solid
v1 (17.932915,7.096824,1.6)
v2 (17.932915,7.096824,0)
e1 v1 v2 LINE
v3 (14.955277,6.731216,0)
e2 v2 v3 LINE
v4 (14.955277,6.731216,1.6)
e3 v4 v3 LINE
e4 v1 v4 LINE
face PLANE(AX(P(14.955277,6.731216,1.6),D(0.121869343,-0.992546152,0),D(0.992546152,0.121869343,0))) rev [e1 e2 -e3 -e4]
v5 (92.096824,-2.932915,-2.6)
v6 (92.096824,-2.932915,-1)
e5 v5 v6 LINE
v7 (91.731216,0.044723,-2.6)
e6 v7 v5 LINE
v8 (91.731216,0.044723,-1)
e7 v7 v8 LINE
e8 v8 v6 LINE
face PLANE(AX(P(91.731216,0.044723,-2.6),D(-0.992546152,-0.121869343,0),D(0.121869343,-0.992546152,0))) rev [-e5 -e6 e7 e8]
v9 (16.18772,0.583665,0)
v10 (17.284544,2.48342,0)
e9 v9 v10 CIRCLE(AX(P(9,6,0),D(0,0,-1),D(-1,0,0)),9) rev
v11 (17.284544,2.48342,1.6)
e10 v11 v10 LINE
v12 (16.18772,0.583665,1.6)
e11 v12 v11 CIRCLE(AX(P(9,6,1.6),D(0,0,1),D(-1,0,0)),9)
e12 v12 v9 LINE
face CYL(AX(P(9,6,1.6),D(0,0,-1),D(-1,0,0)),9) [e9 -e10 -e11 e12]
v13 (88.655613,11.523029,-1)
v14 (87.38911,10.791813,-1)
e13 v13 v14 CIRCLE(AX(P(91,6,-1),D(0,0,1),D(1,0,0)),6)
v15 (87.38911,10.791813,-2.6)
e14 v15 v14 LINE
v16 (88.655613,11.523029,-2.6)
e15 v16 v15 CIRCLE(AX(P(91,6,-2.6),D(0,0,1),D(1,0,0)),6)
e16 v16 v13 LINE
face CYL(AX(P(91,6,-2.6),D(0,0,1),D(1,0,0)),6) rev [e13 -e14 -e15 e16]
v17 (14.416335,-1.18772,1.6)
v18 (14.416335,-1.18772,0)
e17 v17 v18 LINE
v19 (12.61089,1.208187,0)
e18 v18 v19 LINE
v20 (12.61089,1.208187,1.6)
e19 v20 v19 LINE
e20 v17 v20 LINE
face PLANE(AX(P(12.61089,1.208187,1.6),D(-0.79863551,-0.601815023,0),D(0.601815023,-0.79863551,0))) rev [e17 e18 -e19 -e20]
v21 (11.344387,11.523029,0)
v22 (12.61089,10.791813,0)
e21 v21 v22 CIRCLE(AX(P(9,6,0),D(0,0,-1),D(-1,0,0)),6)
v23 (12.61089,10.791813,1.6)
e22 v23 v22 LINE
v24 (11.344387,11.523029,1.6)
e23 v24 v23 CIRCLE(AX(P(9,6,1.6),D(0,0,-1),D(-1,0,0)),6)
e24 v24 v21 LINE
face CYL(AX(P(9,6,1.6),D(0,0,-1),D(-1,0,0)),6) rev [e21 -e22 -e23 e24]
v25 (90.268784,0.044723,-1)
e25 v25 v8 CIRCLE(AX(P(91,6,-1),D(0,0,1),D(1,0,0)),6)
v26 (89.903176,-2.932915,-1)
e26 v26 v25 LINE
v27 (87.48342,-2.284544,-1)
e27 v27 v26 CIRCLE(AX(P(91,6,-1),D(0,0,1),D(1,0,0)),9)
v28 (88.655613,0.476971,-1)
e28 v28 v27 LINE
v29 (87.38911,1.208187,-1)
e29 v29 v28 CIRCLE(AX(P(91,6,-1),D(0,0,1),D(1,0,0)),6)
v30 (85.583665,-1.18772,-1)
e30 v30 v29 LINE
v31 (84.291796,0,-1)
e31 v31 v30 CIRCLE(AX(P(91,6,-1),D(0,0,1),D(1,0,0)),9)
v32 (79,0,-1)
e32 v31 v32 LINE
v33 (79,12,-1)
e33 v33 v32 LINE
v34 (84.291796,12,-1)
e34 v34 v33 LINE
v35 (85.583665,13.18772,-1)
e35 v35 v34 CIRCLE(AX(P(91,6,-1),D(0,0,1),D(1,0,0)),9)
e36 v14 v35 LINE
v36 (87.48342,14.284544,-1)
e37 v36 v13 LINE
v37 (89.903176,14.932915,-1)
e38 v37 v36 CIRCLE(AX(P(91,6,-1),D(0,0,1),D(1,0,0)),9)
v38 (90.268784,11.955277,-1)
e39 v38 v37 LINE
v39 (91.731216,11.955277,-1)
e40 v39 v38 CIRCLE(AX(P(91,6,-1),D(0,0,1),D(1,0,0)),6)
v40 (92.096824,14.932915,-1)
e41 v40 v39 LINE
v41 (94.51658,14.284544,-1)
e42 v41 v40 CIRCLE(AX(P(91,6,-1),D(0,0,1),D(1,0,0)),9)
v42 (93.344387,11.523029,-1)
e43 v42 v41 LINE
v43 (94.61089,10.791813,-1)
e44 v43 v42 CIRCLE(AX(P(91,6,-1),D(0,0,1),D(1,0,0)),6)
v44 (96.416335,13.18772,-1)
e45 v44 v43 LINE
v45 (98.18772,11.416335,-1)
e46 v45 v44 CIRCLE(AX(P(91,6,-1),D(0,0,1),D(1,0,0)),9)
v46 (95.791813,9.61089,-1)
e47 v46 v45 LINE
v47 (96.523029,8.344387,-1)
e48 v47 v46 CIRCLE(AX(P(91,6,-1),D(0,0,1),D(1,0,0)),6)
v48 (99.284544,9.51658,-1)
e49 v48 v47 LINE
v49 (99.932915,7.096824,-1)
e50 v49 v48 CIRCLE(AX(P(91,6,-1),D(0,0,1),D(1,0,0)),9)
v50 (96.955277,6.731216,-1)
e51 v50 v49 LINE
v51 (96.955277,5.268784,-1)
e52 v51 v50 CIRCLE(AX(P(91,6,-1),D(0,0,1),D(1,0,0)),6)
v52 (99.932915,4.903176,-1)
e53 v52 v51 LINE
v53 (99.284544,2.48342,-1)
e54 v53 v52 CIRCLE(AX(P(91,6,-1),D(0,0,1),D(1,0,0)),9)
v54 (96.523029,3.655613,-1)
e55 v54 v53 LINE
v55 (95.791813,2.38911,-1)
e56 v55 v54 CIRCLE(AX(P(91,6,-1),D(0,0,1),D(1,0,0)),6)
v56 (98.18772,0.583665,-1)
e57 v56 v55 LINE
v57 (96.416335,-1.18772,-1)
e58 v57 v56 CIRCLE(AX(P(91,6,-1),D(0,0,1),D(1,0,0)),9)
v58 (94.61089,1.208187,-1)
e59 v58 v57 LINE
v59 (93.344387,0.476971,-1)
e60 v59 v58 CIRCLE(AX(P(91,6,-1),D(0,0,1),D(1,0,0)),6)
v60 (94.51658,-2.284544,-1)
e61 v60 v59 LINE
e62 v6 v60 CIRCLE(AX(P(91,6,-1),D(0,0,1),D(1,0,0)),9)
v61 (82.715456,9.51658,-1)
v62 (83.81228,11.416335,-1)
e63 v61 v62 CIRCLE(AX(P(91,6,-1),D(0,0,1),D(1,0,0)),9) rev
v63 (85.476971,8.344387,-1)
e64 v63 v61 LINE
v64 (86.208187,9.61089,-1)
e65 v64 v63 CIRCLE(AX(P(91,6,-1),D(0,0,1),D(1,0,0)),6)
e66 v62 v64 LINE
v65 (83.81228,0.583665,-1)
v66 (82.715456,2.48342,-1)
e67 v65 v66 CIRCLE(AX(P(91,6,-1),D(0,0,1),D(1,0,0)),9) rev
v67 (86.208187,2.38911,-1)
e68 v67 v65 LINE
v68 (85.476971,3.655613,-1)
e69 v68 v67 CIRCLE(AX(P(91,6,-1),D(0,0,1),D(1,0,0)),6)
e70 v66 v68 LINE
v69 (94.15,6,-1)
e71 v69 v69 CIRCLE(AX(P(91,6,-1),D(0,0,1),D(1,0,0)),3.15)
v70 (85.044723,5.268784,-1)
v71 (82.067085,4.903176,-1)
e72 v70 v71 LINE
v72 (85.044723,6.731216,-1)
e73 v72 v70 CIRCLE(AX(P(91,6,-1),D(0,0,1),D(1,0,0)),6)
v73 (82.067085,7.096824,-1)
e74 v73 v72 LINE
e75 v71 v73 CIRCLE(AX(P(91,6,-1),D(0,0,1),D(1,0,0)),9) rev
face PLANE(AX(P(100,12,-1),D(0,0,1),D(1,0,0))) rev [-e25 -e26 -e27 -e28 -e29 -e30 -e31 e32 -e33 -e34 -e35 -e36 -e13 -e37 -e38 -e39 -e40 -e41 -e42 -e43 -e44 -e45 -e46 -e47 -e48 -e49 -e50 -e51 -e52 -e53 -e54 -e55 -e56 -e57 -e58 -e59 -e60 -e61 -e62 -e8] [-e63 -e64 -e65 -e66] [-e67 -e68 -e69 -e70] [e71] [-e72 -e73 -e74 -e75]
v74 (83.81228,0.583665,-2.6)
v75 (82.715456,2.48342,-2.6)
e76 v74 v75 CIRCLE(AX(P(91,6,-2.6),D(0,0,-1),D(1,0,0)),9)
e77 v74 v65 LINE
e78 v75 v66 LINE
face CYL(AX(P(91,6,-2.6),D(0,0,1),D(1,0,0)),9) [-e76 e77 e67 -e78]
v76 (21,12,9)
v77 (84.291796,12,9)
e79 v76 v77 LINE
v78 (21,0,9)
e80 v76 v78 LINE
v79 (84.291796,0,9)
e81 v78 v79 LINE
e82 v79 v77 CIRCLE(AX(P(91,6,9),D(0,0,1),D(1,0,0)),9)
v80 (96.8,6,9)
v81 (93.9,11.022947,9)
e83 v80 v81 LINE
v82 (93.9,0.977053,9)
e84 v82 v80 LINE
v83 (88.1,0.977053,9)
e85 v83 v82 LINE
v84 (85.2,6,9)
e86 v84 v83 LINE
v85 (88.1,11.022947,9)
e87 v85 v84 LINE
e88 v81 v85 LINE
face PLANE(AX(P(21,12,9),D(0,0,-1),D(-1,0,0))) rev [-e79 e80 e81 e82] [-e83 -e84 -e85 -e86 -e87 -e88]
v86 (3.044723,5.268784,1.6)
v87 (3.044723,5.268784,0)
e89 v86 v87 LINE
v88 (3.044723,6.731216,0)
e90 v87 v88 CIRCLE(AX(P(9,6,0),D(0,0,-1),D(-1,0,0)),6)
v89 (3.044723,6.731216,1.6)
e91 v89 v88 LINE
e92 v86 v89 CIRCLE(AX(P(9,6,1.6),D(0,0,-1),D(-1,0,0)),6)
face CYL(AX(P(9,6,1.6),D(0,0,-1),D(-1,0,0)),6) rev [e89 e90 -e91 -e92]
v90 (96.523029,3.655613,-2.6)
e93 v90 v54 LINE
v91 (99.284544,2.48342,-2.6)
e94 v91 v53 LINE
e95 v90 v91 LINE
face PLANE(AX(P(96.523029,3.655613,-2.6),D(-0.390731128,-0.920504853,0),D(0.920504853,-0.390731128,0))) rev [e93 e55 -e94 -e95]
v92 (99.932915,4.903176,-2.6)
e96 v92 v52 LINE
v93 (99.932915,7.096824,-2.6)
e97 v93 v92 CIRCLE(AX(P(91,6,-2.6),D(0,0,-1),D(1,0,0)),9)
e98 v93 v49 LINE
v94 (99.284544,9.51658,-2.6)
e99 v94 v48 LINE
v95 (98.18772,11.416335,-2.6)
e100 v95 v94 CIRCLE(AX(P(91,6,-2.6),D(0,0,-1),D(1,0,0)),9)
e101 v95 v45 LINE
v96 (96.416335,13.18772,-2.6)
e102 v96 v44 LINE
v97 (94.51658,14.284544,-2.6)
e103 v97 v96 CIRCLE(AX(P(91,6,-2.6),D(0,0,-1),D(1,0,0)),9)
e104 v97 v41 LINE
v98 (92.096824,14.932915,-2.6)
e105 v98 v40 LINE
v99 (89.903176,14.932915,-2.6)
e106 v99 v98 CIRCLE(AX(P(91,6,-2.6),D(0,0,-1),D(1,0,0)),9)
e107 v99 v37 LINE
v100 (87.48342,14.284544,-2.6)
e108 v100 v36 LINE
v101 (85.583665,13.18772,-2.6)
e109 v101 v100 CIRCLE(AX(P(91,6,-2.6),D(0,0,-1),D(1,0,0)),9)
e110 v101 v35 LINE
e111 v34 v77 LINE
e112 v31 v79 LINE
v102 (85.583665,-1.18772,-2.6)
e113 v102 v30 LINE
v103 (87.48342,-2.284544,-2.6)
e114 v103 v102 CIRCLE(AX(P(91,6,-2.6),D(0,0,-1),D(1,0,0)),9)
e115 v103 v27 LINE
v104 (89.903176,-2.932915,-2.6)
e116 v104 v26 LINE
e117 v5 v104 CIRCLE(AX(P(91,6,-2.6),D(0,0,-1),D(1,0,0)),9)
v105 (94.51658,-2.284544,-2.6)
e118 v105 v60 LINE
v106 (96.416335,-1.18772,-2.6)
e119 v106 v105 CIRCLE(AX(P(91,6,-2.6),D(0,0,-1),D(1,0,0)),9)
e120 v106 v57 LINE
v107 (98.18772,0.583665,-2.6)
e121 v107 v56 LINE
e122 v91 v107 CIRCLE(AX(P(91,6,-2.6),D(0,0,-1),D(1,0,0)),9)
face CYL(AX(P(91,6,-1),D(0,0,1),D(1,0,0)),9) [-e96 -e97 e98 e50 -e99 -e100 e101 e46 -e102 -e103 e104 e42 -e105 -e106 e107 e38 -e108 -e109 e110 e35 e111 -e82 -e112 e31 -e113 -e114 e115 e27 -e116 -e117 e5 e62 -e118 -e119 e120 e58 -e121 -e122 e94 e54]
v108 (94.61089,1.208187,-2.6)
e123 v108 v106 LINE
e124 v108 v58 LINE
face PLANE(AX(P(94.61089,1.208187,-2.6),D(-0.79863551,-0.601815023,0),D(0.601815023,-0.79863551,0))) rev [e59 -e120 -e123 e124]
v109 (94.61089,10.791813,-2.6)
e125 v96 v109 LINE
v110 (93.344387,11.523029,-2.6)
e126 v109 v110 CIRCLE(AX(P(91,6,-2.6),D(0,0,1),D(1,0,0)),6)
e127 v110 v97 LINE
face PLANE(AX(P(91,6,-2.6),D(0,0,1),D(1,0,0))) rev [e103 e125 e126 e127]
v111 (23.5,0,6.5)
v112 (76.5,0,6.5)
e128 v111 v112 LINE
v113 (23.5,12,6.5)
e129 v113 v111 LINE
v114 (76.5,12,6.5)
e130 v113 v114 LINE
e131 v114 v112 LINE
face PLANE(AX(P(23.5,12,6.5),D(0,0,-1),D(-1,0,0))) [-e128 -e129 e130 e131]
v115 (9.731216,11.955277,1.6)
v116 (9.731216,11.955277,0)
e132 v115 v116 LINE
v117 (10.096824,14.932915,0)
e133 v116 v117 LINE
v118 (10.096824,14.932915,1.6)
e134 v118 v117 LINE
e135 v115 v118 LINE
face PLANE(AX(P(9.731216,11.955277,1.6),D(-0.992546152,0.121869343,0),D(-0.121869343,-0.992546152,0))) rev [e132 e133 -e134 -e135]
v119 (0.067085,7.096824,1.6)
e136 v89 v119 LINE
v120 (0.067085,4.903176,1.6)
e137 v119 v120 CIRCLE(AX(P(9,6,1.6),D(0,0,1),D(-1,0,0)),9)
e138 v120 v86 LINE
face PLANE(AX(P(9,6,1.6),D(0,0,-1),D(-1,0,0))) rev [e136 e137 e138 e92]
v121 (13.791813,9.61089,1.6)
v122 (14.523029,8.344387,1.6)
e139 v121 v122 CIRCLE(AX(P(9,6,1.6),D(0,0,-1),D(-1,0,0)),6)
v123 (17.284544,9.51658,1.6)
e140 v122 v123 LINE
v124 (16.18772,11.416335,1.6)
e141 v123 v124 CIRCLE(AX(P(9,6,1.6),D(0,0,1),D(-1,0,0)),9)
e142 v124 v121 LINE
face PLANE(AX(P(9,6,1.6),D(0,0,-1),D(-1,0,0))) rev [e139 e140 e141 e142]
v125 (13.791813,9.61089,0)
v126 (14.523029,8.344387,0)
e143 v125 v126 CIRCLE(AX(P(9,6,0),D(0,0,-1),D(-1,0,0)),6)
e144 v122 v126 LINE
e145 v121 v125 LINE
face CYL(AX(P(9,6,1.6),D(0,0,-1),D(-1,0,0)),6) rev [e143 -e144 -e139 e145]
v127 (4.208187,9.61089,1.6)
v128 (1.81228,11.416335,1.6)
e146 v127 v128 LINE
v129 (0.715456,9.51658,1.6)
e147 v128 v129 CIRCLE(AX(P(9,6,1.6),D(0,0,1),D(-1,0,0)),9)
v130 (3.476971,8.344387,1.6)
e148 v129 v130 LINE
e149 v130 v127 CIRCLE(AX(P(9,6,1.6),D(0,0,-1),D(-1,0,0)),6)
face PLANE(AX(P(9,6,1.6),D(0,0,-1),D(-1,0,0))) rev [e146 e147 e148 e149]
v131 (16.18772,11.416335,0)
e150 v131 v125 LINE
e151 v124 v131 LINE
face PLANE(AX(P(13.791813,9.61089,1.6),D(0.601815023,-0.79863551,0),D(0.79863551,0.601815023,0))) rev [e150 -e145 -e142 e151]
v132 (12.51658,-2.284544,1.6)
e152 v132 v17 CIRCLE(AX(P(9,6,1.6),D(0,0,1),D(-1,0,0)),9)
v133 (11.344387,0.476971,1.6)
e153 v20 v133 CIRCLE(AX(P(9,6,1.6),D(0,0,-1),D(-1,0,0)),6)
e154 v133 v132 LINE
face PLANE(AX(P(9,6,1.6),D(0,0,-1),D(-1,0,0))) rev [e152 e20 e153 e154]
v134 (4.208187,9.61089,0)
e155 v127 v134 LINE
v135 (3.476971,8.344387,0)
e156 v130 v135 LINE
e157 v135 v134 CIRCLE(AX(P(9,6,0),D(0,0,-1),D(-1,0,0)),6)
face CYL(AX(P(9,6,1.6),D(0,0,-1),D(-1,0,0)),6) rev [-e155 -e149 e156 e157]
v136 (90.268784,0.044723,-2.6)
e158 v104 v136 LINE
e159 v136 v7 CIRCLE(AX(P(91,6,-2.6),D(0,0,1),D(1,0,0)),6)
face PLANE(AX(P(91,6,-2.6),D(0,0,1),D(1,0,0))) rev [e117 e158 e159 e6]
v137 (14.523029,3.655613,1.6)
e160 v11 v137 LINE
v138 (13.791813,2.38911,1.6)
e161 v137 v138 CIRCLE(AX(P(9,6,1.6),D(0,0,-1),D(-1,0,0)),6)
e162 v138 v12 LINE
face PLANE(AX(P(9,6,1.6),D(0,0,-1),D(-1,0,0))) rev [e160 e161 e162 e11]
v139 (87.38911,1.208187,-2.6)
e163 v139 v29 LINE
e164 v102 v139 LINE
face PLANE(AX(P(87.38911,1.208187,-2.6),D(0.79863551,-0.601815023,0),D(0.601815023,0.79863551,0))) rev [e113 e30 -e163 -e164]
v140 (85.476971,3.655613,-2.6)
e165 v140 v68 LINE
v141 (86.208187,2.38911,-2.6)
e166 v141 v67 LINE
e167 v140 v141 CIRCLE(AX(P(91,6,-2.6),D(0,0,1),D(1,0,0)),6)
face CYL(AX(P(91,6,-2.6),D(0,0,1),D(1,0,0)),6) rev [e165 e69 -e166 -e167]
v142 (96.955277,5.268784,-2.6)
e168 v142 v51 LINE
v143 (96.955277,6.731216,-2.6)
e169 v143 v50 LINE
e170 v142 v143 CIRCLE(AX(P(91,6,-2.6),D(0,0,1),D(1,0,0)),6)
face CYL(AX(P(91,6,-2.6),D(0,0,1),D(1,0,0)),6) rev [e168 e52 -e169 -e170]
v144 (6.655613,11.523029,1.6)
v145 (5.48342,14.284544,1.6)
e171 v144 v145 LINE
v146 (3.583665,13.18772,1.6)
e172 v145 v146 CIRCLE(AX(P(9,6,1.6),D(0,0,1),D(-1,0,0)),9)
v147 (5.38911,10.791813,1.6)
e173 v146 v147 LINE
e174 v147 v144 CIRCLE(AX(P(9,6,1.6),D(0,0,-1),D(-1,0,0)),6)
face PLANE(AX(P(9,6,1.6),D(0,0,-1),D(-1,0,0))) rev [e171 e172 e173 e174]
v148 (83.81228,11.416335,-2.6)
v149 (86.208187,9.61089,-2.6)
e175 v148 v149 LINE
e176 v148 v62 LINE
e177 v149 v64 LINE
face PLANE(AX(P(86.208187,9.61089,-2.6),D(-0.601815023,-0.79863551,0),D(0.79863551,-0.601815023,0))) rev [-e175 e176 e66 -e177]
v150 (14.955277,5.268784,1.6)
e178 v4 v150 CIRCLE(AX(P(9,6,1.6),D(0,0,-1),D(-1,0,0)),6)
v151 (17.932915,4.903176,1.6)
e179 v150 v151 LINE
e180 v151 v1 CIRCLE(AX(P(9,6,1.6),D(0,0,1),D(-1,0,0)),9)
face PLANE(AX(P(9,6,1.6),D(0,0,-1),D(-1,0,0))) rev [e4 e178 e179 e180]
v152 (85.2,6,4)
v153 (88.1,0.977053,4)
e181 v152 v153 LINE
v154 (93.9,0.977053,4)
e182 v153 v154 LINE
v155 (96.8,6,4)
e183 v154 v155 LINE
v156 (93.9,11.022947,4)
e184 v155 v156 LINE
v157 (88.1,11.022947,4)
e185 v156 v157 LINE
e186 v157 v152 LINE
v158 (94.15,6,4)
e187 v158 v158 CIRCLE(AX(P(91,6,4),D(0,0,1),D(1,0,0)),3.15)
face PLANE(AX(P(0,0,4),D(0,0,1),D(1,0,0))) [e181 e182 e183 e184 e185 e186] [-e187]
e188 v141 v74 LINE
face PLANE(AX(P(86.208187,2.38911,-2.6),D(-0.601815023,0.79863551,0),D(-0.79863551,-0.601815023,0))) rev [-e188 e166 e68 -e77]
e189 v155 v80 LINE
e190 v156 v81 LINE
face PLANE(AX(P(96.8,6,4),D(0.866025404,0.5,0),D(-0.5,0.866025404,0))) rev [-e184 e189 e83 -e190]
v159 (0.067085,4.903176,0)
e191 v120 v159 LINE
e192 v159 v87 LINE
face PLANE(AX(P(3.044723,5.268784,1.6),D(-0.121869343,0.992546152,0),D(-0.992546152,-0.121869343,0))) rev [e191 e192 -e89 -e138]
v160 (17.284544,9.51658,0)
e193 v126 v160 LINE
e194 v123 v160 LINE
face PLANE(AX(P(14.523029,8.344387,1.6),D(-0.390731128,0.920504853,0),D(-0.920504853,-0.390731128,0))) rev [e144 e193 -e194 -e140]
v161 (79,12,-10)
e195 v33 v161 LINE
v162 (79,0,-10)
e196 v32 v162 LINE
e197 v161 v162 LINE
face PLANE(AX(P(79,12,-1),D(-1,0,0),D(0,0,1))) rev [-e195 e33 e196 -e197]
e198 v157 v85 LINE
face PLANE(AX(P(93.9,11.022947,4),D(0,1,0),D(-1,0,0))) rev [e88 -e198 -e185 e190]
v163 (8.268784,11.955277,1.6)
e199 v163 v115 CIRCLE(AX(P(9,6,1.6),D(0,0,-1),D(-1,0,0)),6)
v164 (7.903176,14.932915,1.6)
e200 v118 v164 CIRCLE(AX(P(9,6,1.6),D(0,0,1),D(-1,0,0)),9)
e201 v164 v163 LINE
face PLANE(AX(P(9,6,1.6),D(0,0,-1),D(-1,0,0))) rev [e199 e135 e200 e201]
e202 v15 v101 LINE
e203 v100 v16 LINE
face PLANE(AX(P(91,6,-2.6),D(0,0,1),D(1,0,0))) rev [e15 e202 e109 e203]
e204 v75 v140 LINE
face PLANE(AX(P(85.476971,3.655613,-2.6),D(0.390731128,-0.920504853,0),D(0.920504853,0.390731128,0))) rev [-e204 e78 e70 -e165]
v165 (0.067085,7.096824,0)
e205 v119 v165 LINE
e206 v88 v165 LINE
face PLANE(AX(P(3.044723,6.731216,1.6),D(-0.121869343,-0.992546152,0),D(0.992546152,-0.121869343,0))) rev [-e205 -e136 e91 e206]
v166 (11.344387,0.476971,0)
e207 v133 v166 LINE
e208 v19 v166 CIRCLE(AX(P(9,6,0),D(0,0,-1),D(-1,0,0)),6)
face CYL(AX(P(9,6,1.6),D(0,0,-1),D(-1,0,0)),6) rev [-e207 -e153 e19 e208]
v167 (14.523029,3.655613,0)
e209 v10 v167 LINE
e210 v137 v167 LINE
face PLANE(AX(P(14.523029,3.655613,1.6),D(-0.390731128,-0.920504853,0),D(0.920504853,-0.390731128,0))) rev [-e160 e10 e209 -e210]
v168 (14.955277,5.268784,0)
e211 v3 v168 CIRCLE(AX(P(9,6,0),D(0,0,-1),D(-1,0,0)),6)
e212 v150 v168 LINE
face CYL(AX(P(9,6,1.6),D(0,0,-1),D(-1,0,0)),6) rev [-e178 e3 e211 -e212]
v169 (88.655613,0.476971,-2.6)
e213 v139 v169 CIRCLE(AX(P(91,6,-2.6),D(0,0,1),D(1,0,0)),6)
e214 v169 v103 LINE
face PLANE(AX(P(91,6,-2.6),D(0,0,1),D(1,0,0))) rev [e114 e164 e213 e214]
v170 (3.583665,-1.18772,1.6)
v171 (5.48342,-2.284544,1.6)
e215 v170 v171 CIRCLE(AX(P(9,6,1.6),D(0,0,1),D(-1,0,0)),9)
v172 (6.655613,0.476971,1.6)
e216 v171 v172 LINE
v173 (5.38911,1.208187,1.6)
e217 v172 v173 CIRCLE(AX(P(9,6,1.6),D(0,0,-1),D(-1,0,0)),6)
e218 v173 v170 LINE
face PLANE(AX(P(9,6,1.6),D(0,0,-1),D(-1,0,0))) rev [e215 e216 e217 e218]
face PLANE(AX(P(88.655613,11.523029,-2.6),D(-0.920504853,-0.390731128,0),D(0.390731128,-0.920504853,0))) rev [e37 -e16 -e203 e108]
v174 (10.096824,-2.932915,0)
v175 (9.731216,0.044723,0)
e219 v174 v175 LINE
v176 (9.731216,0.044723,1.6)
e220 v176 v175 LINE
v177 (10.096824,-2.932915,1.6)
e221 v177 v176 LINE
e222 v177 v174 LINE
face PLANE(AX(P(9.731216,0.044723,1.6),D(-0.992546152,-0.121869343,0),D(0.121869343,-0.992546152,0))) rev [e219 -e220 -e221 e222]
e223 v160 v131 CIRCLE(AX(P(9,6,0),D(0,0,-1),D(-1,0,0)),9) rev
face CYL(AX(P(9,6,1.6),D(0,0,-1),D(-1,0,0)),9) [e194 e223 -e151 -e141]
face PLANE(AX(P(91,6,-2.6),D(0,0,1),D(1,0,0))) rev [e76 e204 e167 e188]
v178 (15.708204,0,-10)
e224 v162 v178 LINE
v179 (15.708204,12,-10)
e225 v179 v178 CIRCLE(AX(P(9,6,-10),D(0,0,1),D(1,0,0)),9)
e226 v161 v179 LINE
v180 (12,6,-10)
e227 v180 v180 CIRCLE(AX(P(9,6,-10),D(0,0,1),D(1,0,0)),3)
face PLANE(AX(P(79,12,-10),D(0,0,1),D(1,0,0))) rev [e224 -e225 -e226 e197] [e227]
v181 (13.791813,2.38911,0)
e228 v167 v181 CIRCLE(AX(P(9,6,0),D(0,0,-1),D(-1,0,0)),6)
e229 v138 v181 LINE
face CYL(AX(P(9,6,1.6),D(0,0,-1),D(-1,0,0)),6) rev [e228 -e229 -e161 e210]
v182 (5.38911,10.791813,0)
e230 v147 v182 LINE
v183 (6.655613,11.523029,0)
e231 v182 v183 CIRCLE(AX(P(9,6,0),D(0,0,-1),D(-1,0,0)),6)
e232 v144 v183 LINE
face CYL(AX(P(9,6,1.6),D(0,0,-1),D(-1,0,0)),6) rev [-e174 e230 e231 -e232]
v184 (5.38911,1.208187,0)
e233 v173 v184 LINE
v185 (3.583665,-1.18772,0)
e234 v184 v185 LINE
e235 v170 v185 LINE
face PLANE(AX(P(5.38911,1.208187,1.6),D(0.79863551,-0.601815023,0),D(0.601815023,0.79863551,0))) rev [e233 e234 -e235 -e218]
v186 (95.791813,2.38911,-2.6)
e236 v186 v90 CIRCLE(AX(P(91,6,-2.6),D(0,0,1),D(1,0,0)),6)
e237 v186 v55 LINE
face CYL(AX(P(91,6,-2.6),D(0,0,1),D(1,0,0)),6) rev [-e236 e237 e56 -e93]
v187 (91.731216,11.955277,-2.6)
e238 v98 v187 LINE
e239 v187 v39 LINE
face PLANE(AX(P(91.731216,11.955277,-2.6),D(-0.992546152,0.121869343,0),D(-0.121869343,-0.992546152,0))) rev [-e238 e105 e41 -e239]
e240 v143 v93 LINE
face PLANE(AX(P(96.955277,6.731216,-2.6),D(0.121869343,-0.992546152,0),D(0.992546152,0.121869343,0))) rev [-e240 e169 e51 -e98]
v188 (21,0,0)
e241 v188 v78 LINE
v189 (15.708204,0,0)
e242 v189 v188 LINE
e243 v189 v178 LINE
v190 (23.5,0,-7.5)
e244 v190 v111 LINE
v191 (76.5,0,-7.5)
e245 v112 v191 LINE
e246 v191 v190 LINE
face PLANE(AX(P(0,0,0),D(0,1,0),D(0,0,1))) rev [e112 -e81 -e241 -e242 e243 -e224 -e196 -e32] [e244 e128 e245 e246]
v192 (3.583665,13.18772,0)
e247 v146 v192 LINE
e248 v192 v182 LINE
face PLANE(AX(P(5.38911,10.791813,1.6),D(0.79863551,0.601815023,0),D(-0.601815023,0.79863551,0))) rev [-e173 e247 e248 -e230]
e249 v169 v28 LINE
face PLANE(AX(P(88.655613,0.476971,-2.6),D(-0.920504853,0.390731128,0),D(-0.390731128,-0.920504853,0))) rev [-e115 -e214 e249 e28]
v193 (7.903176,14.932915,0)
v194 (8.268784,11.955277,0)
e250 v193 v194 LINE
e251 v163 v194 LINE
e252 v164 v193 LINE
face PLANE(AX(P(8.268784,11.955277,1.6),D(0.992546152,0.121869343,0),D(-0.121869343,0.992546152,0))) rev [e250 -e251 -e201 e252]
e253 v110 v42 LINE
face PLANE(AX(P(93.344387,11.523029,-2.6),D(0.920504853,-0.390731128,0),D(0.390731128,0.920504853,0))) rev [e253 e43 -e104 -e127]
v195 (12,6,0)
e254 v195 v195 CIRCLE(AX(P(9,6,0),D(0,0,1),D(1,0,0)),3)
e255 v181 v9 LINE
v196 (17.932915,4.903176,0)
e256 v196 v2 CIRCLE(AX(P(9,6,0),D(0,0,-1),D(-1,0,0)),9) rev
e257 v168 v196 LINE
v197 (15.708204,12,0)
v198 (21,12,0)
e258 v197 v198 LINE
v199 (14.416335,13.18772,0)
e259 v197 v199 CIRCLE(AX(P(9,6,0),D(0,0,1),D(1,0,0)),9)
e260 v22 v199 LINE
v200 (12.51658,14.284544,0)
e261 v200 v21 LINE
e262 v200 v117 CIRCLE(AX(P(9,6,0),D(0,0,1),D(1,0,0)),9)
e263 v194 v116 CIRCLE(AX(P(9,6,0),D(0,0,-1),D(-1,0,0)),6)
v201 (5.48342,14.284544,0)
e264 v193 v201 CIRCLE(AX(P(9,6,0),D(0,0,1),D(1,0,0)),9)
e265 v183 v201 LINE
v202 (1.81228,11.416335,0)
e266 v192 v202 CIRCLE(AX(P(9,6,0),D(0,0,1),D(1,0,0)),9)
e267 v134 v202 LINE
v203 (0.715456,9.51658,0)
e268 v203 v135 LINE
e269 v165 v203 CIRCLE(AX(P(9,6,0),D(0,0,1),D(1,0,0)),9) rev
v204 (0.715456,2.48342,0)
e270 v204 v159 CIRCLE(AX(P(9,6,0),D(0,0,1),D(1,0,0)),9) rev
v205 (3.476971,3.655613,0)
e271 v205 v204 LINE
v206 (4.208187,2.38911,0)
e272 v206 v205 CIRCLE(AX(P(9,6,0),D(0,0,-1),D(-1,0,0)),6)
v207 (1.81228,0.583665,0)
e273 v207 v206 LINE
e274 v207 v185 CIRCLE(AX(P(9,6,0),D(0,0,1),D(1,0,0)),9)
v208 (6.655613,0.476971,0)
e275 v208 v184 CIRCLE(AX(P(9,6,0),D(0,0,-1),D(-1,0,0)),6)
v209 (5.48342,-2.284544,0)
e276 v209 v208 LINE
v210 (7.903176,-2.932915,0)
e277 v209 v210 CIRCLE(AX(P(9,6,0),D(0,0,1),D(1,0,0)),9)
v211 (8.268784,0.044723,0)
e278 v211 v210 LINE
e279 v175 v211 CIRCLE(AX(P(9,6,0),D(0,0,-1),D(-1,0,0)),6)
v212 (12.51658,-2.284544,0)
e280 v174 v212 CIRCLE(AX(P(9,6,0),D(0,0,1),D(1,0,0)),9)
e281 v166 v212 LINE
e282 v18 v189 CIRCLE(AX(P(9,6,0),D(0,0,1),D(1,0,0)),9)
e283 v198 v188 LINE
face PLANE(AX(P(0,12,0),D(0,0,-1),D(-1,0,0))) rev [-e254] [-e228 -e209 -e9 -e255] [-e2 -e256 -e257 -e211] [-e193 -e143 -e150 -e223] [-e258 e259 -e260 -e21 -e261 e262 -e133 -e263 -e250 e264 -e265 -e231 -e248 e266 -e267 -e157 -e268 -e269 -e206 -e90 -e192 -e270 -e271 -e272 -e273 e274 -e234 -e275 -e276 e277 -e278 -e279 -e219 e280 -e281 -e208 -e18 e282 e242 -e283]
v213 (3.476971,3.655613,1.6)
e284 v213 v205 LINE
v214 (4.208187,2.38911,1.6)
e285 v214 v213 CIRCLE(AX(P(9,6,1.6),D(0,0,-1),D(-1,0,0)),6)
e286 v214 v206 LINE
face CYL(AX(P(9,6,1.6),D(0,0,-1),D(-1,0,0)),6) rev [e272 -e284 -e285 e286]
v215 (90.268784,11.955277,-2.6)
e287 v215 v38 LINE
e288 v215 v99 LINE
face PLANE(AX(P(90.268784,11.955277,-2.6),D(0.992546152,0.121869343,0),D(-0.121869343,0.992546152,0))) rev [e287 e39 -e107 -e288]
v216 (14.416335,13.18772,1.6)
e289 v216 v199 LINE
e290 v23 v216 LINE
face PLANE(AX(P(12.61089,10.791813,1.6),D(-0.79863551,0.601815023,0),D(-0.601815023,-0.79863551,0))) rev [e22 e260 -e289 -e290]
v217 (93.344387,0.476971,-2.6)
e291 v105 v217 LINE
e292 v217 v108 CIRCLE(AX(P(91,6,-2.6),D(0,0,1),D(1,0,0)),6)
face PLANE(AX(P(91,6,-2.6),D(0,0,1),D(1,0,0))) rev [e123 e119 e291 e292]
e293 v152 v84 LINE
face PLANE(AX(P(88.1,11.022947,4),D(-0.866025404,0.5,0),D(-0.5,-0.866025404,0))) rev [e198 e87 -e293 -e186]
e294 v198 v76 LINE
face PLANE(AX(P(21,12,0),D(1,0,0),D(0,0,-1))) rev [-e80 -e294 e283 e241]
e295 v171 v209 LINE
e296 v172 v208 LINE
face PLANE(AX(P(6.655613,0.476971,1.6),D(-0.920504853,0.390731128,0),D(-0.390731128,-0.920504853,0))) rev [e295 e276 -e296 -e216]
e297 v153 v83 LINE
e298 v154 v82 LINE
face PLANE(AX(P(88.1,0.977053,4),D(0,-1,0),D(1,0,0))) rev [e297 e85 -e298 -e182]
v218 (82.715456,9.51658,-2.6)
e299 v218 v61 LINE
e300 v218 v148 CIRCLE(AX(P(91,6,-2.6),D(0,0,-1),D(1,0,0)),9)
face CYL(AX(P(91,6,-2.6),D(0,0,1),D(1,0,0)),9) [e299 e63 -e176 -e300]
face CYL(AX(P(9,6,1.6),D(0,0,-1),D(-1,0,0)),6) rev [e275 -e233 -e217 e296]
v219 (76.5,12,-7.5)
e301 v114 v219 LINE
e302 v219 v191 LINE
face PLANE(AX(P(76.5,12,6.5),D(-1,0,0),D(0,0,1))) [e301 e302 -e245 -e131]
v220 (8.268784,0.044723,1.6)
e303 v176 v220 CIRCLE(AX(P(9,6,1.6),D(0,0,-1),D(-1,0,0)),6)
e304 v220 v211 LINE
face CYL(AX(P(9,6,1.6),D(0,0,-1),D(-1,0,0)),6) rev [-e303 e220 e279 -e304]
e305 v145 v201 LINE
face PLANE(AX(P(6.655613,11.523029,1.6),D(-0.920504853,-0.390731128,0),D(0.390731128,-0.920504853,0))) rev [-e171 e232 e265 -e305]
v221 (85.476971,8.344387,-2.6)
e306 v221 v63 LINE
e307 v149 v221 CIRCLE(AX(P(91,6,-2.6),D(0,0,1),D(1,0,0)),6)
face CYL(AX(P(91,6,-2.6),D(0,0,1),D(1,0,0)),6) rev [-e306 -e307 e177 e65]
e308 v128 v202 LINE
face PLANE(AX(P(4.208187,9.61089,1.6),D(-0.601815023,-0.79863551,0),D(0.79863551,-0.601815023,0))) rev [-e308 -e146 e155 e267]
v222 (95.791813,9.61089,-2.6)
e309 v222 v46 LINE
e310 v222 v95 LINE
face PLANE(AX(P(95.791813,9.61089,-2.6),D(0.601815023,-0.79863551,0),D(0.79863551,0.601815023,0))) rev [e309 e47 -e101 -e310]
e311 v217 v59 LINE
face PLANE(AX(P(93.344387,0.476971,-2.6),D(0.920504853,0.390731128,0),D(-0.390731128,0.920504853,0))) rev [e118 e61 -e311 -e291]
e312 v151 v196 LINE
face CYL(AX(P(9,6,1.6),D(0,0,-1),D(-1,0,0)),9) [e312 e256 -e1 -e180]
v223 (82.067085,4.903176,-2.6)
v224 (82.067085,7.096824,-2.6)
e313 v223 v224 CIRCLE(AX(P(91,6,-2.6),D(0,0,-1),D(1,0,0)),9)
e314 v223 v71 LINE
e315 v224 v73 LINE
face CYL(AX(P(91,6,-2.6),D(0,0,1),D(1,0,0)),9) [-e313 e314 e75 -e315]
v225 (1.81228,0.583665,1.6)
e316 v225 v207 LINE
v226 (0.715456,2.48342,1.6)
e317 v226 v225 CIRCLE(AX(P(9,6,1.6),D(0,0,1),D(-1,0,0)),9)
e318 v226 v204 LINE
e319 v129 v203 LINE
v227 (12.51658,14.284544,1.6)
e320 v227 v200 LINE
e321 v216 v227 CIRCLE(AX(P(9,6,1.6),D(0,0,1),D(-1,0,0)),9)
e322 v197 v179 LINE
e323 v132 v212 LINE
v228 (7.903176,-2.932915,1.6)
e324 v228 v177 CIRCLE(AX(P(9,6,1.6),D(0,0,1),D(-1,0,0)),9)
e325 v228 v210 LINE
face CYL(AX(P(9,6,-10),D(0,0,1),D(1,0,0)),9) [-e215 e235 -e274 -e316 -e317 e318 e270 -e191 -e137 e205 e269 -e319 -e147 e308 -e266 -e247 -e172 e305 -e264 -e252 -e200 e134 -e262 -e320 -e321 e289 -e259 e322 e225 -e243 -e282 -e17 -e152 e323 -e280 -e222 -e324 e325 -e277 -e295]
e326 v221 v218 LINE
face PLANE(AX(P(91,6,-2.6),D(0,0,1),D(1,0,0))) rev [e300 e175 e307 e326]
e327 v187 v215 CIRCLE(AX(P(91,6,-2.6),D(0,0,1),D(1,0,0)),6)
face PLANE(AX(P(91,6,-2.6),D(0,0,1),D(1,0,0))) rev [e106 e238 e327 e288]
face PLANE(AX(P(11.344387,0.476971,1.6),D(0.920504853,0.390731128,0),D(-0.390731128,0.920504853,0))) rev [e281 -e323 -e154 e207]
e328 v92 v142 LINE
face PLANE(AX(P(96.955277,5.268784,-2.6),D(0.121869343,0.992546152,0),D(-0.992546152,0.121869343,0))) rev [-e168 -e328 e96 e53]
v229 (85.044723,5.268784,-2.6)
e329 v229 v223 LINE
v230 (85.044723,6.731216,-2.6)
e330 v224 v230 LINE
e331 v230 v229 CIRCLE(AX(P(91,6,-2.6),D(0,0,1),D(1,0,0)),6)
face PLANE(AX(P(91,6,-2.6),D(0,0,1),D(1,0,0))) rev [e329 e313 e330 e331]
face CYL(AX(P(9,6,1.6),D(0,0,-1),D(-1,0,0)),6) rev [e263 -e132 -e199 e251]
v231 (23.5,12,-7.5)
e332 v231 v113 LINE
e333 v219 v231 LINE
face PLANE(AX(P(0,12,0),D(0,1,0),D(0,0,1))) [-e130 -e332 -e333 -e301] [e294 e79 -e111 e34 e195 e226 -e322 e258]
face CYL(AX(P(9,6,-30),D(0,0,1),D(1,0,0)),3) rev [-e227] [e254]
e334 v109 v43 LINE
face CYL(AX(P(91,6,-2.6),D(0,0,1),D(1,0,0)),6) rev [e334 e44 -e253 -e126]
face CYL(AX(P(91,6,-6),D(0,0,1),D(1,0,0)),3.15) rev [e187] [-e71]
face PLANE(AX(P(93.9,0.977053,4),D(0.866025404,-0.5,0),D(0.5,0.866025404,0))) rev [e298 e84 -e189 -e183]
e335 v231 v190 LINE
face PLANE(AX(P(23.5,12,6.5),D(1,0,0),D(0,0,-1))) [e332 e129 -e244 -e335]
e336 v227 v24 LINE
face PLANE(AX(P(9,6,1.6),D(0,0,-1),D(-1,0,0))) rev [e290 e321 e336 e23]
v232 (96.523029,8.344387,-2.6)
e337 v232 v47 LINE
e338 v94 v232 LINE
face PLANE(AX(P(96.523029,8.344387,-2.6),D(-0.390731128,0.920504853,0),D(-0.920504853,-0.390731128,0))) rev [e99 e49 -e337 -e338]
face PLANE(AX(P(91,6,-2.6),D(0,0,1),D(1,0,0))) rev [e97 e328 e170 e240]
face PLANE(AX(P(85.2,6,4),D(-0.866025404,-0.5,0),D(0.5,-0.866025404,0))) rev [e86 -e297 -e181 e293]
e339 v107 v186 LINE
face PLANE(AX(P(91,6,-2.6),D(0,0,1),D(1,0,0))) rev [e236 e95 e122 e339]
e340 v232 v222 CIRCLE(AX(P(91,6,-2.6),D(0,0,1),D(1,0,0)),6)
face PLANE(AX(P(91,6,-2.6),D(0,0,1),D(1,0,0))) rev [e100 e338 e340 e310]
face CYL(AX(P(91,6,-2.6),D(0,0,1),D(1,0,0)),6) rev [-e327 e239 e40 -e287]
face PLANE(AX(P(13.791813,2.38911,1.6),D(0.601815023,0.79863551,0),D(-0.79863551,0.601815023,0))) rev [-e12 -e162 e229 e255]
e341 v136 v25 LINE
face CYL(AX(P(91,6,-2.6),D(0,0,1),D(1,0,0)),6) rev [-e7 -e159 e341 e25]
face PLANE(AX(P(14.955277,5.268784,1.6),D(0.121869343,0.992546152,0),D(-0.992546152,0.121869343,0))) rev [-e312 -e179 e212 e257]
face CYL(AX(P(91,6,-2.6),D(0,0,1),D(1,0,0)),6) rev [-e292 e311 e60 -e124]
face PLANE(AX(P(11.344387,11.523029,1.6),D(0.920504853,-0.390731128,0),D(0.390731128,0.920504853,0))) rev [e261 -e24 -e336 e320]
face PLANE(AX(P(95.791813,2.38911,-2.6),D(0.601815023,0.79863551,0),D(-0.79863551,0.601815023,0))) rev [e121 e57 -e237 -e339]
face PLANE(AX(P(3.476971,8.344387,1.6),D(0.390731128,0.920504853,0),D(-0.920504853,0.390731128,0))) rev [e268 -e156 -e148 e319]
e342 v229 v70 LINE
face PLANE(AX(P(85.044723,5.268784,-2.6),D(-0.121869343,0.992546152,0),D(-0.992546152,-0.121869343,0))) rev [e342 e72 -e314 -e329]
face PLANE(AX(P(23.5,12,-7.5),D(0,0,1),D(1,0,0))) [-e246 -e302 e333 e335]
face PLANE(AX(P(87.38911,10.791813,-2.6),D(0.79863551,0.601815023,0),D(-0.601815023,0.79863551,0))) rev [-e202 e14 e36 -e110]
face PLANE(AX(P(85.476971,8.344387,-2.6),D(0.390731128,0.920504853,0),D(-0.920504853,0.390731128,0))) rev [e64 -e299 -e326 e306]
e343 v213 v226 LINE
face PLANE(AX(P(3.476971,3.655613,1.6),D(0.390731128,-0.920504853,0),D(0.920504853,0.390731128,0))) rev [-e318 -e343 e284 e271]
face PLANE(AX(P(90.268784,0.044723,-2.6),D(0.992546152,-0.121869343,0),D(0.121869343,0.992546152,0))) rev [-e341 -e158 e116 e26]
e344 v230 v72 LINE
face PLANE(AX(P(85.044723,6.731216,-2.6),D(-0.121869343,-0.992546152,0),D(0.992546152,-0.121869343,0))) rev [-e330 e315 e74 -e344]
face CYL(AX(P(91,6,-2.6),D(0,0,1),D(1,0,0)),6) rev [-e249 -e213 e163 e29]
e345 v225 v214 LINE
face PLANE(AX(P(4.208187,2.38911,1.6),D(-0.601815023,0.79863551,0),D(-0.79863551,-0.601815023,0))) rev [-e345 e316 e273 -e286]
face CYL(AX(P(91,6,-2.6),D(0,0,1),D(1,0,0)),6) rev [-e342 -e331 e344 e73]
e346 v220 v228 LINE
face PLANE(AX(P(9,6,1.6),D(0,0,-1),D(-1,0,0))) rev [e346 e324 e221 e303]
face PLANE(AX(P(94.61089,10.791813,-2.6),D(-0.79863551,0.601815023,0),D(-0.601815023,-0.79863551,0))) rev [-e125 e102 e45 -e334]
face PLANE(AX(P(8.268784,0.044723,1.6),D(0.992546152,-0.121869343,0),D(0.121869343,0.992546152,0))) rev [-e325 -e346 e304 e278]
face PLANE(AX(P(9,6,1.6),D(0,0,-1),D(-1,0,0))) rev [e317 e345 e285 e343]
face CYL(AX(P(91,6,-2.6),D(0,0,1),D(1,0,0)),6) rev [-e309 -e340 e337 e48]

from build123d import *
from build123d.topology import SkipClean

# Parameters (mm, degrees)
CROQUIS1_W              = 53
CROQUIS1_H              = 14
SALIENTE_EXTRUIR1_DEPTH = 12
CROQUIS2_R              = 9
SALIENTE_EXTRUIR2_DEPTH = 10
CORTAR_EXTRUIR3_DEPTH   = 5
CROQUIS5_R              = 3.15
CORTAR_EXTRUIR4_DEPTH   = 10
CROQUIS6_R              = 9
SALIENTE_EXTRUIR3_DEPTH = 10
CROQUIS3_R              = 3
CORTAR_EXTRUIR5_DEPTH   = 30
SALIENTE_EXTRUIR4_DEPTH = 1.6
SALIENTE_EXTRUIR5_DEPTH = 1.6
CORTAR_EXTRUIR6_START   = -10
CORTAR_EXTRUIR6_DEPTH   = 10
CORTAR_EXTRUIR7_START   = -10
CORTAR_EXTRUIR7_DEPTH   = 10


# Read off the part's stored shape, not the designer's step: Cortar-Extruir6, Cortar-Extruir7
with BuildPart() as part:
    # Croquis1 → Saliente-Extruir1 (new body)
    with BuildSketch(Plane(origin=(0, 0, 0), x_dir=(1, 0, 0), z_dir=(0, 1, 0))):
        Polygon((0, 0), (21, 0), (21, -9), (100, -9), (100, 1), (79, 1), (79, 10), (0, 10), align=None)
        with Locations((50, 0.5)):
            Rectangle(CROQUIS1_W, CROQUIS1_H, mode=Mode.SUBTRACT)
    extrude(amount=SALIENTE_EXTRUIR1_DEPTH)

    # Croquis2 → Saliente-Extruir2 (add)
    with BuildSketch(Plane.XY):
        with Locations((9, 6)):
            Circle(CROQUIS2_R)
    extrude(amount=-SALIENTE_EXTRUIR2_DEPTH)

    # Croquis4 → Cortar-Extruir3 (cut)
    with BuildSketch(Plane.XY.offset(9)):
        Polygon((96.8, 6), (93.9, 11.022947342), (88.1, 11.022947342), (85.2, 6), (88.1, 0.977052658), (93.9, 0.977052658), align=None)
    extrude(amount=-CORTAR_EXTRUIR3_DEPTH, mode=Mode.SUBTRACT)

    # Croquis5 → Cortar-Extruir4 (cut)
    with BuildSketch(Plane.XY.offset(4)):
        with Locations((91, 6)):
            Circle(CROQUIS5_R)
    extrude(amount=-CORTAR_EXTRUIR4_DEPTH, mode=Mode.SUBTRACT)

    # Croquis6 → Saliente-Extruir3 (add)
    with BuildSketch(Plane.XY.offset(9)):
        with Locations((91, 6)):
            Circle(CROQUIS6_R)
        Polygon((96.8, 6), (93.9, 11.022947342), (88.1, 11.022947342), (85.2, 6), (88.1, 0.977052658), (93.9, 0.977052658), align=None, mode=Mode.SUBTRACT)
    extrude(amount=-SALIENTE_EXTRUIR3_DEPTH)

    # Croquis3 → Cortar-Extruir5 (cut)
    with BuildSketch(Plane.XY):
        with Locations((9, 6)):
            Circle(CROQUIS3_R)
    extrude(amount=-CORTAR_EXTRUIR5_DEPTH, mode=Mode.SUBTRACT)

    # Croquis7 → Saliente-Extruir4 (add, symmetric)
    with SkipClean():  # the faces are left unmerged after this step: merging them gives an invalid solid
        with BuildSketch(Plane.XY):
            with BuildLine():
                Line((8.26878394, 11.95527691), (7.903175909, 14.932915365))
                ThreePointArc((7.903175909, 14.932915365), (9, 15), (10.096824091, 14.932915365))
                Line((10.096824091, 14.932915365), (9.73121606, 11.95527691))
                ThreePointArc((9.73121606, 11.95527691), (9, 12), (8.26878394, 11.95527691))
            make_face()
            with BuildLine():
                Line((12.610890139, 10.79181306), (14.416335208, 13.18771959))
                ThreePointArc((14.416335208, 13.18771959), (13.5, 13.794228634), (12.516580156, 14.284543681))
                Line((12.516580156, 14.284543681), (11.344386771, 11.523029121))
                ThreePointArc((11.344386771, 11.523029121), (12, 11.196152423), (12.610890139, 10.79181306))
            make_face()
            with BuildLine():
                Line((14.523029121, 8.344386771), (17.284543681, 9.516580156))
                ThreePointArc((17.284543681, 9.516580156), (16.794228634, 10.5), (16.18771959, 11.416335208))
                Line((16.18771959, 11.416335208), (13.79181306, 9.610890139))
                ThreePointArc((13.79181306, 9.610890139), (14.196152423, 9), (14.523029121, 8.344386771))
            make_face()
            with BuildLine():
                Line((14.95527691, 5.26878394), (17.932915365, 4.903175909))
                ThreePointArc((17.932915365, 4.903175909), (18, 6), (17.932915365, 7.096824091))
                Line((17.932915365, 7.096824091), (14.95527691, 6.73121606))
                ThreePointArc((14.95527691, 6.73121606), (15, 6), (14.95527691, 5.26878394))
            make_face()
            with BuildLine():
                Line((13.79181306, 2.389109861), (16.18771959, 0.583664792))
                ThreePointArc((16.18771959, 0.583664792), (16.794228634, 1.5), (17.284543681, 2.483419844))
                Line((17.284543681, 2.483419844), (14.523029121, 3.655613229))
                ThreePointArc((14.523029121, 3.655613229), (14.196152423, 3), (13.79181306, 2.389109861))
            make_face()
            with BuildLine():
                Line((11.344386771, 0.476970879), (12.516580156, -2.284543681))
                ThreePointArc((12.516580156, -2.284543681), (13.5, -1.794228634), (14.416335208, -1.18771959))
                Line((14.416335208, -1.18771959), (12.610890139, 1.20818694))
                ThreePointArc((12.610890139, 1.20818694), (12, 0.803847577), (11.344386771, 0.476970879))
            make_face()
            with BuildLine():
                Line((8.26878394, 0.04472309), (7.903175909, -2.932915365))
                ThreePointArc((7.903175909, -2.932915365), (9, -3), (10.096824091, -2.932915365))
                Line((10.096824091, -2.932915365), (9.73121606, 0.04472309))
                ThreePointArc((9.73121606, 0.04472309), (9, 0), (8.26878394, 0.04472309))
            make_face()
            with BuildLine():
                Line((5.389109861, 1.20818694), (3.583664792, -1.18771959))
                ThreePointArc((3.583664792, -1.18771959), (4.5, -1.794228634), (5.483419844, -2.284543681))
                Line((5.483419844, -2.284543681), (6.655613229, 0.476970879))
                ThreePointArc((6.655613229, 0.476970879), (6, 0.803847577), (5.389109861, 1.20818694))
            make_face()
            with BuildLine():
                Line((3.476970879, 3.655613229), (0.715456319, 2.483419844))
                ThreePointArc((0.715456319, 2.483419844), (1.205771366, 1.5), (1.81228041, 0.583664792))
                Line((1.81228041, 0.583664792), (4.20818694, 2.389109861))
                ThreePointArc((4.20818694, 2.389109861), (3.803847577, 3), (3.476970879, 3.655613229))
            make_face()
            with BuildLine():
                Line((3.04472309, 6.73121606), (0.067084635, 7.096824091))
                ThreePointArc((0.067084635, 7.096824091), (0, 6), (0.067084635, 4.903175909))
                Line((0.067084635, 4.903175909), (3.04472309, 5.26878394))
                ThreePointArc((3.04472309, 5.26878394), (3, 6), (3.04472309, 6.73121606))
            make_face()
            with BuildLine():
                Line((4.20818694, 9.610890139), (1.81228041, 11.416335208))
                ThreePointArc((1.81228041, 11.416335208), (1.205771366, 10.5), (0.715456319, 9.516580156))
                Line((0.715456319, 9.516580156), (3.476970879, 8.344386771))
                ThreePointArc((3.476970879, 8.344386771), (3.803847577, 9), (4.20818694, 9.610890139))
            make_face()
            with BuildLine():
                Line((6.655613229, 11.523029121), (5.483419844, 14.284543681))
                ThreePointArc((5.483419844, 14.284543681), (4.5, 13.794228634), (3.583664792, 13.18771959))
                Line((3.583664792, 13.18771959), (5.389109861, 10.79181306))
                ThreePointArc((5.389109861, 10.79181306), (6, 11.196152423), (6.655613229, 11.523029121))
            make_face()
        extrude(amount=SALIENTE_EXTRUIR4_DEPTH, both=True)

    # Croquis8 → Saliente-Extruir5 (add, symmetric)
    with SkipClean():  # the faces are left unmerged after this step: merging them gives an invalid solid
        with BuildSketch(Plane(origin=(0, 0, -1), x_dir=(-1, 0, 0), z_dir=(0, 0, -1))):
            with BuildLine():
                Line((-91.73121606, 11.95527691), (-92.096824091, 14.932915365))
                ThreePointArc((-92.096824091, 14.932915365), (-91, 15), (-89.903175909, 14.932915365))
                Line((-89.903175909, 14.932915365), (-90.26878394, 11.95527691))
                ThreePointArc((-90.26878394, 11.95527691), (-91, 12), (-91.73121606, 11.95527691))
            make_face()
            with BuildLine():
                Line((-87.389109861, 10.79181306), (-85.583664792, 13.18771959))
                ThreePointArc((-85.583664792, 13.18771959), (-86.5, 13.794228634), (-87.483419844, 14.284543681))
                Line((-87.483419844, 14.284543681), (-88.655613229, 11.523029121))
                ThreePointArc((-88.655613229, 11.523029121), (-88, 11.196152423), (-87.389109861, 10.79181306))
            make_face()
            with BuildLine():
                Line((-85.476970879, 8.344386771), (-82.715456319, 9.516580156))
                ThreePointArc((-82.715456319, 9.516580156), (-83.205771366, 10.5), (-83.81228041, 11.416335208))
                Line((-83.81228041, 11.416335208), (-86.20818694, 9.610890139))
                ThreePointArc((-86.20818694, 9.610890139), (-85.803847577, 9), (-85.476970879, 8.344386771))
            make_face()
            with BuildLine():
                Line((-85.04472309, 5.26878394), (-82.067084635, 4.903175909))
                ThreePointArc((-82.067084635, 4.903175909), (-82, 6), (-82.067084635, 7.096824091))
                Line((-82.067084635, 7.096824091), (-85.04472309, 6.73121606))
                ThreePointArc((-85.04472309, 6.73121606), (-85, 6), (-85.04472309, 5.26878394))
            make_face()
            with BuildLine():
                Line((-86.20818694, 2.389109861), (-83.81228041, 0.583664792))
                ThreePointArc((-83.81228041, 0.583664792), (-83.205771366, 1.5), (-82.715456319, 2.483419844))
                Line((-82.715456319, 2.483419844), (-85.476970879, 3.655613229))
                ThreePointArc((-85.476970879, 3.655613229), (-85.803847577, 3), (-86.20818694, 2.389109861))
            make_face()
            with BuildLine():
                Line((-88.655613229, 0.476970879), (-87.483419844, -2.284543681))
                ThreePointArc((-87.483419844, -2.284543681), (-86.5, -1.794228634), (-85.583664792, -1.18771959))
                Line((-85.583664792, -1.18771959), (-87.389109861, 1.20818694))
                ThreePointArc((-87.389109861, 1.20818694), (-88, 0.803847577), (-88.655613229, 0.476970879))
            make_face()
            with BuildLine():
                Line((-91.73121606, 0.04472309), (-92.096824091, -2.932915365))
                ThreePointArc((-92.096824091, -2.932915365), (-91, -3), (-89.903175909, -2.932915365))
                Line((-89.903175909, -2.932915365), (-90.26878394, 0.04472309))
                ThreePointArc((-90.26878394, 0.04472309), (-91, 0), (-91.73121606, 0.04472309))
            make_face()
            with BuildLine():
                Line((-94.610890139, 1.20818694), (-96.416335208, -1.18771959))
                ThreePointArc((-96.416335208, -1.18771959), (-95.5, -1.794228634), (-94.516580156, -2.284543681))
                Line((-94.516580156, -2.284543681), (-93.344386771, 0.476970879))
                ThreePointArc((-93.344386771, 0.476970879), (-94, 0.803847577), (-94.610890139, 1.20818694))
            make_face()
            with BuildLine():
                Line((-96.523029121, 3.655613229), (-99.284543681, 2.483419844))
                ThreePointArc((-99.284543681, 2.483419844), (-98.794228634, 1.5), (-98.18771959, 0.583664792))
                Line((-98.18771959, 0.583664792), (-95.79181306, 2.389109861))
                ThreePointArc((-95.79181306, 2.389109861), (-96.196152423, 3), (-96.523029121, 3.655613229))
            make_face()
            with BuildLine():
                Line((-96.95527691, 6.73121606), (-99.932915365, 7.096824091))
                ThreePointArc((-99.932915365, 7.096824091), (-100, 6), (-99.932915365, 4.903175909))
                Line((-99.932915365, 4.903175909), (-96.95527691, 5.26878394))
                ThreePointArc((-96.95527691, 5.26878394), (-97, 6), (-96.95527691, 6.73121606))
            make_face()
            with BuildLine():
                Line((-95.79181306, 9.610890139), (-98.18771959, 11.416335208))
                ThreePointArc((-98.18771959, 11.416335208), (-98.794228634, 10.5), (-99.284543681, 9.516580156))
                Line((-99.284543681, 9.516580156), (-96.523029121, 8.344386771))
                ThreePointArc((-96.523029121, 8.344386771), (-96.196152423, 9), (-95.79181306, 9.610890139))
            make_face()
            with BuildLine():
                Line((-93.344386771, 11.523029121), (-94.516580156, 14.284543681))
                ThreePointArc((-94.516580156, 14.284543681), (-95.5, 13.794228634), (-96.416335208, 13.18771959))
                Line((-96.416335208, 13.18771959), (-94.610890139, 10.79181306))
                ThreePointArc((-94.610890139, 10.79181306), (-94, 11.196152423), (-93.344386771, 11.523029121))
            make_face()
        extrude(amount=SALIENTE_EXTRUIR5_DEPTH, both=True)

    # Cortar-Extruir6 outline → Cortar-Extruir6 (cut)
    with SkipClean():  # the faces are left unmerged after this step: merging them gives an invalid solid
        with BuildSketch(Plane(origin=(0, 0, -10), x_dir=(-1, 0, 0), z_dir=(0, 0, -1)).offset(CORTAR_EXTRUIR6_START)):
            with BuildLine():
                Line((0, 12), (-2.291796068, 12))
                ThreePointArc((-2.291796068, 12), (-0.59244875, 9.211398758), (0, 5.999999893))
                Line((0, 5.999999893), (0, 12))
            make_face()
            with BuildLine():
                Line((0, 0), (0, 5.999999893))
                ThreePointArc((0, 5.999999893), (-0.592448789, 2.788601142), (-2.291796068, 0))
                Line((-2.291796068, 0), (0, 0))
            make_face()
        extrude(amount=CORTAR_EXTRUIR6_DEPTH, mode=Mode.SUBTRACT)

    # Cortar-Extruir7 outline → Cortar-Extruir7 (cut)
    with SkipClean():  # the faces are left unmerged after this step: merging them gives an invalid solid
        with BuildSketch(Plane(origin=(0, 0, -1), x_dir=(-1, 0, 0), z_dir=(0, 0, -1)).offset(CORTAR_EXTRUIR7_START)):
            with BuildLine():
                Line((-100, 0), (-97.708203932, 0))
                ThreePointArc((-97.708203932, 0), (-99.407551231, 2.788601192), (-100, 6))
                Line((-100, 6), (-100, 0))
            make_face()
            with BuildLine():
                Line((-100, 12), (-100, 6))
                ThreePointArc((-100, 6), (-99.407551231, 9.211398808), (-97.708203932, 12))
                Line((-97.708203932, 12), (-100, 12))
            make_face()
        extrude(amount=CORTAR_EXTRUIR7_DEPTH, mode=Mode.SUBTRACT)


solid = part.part
